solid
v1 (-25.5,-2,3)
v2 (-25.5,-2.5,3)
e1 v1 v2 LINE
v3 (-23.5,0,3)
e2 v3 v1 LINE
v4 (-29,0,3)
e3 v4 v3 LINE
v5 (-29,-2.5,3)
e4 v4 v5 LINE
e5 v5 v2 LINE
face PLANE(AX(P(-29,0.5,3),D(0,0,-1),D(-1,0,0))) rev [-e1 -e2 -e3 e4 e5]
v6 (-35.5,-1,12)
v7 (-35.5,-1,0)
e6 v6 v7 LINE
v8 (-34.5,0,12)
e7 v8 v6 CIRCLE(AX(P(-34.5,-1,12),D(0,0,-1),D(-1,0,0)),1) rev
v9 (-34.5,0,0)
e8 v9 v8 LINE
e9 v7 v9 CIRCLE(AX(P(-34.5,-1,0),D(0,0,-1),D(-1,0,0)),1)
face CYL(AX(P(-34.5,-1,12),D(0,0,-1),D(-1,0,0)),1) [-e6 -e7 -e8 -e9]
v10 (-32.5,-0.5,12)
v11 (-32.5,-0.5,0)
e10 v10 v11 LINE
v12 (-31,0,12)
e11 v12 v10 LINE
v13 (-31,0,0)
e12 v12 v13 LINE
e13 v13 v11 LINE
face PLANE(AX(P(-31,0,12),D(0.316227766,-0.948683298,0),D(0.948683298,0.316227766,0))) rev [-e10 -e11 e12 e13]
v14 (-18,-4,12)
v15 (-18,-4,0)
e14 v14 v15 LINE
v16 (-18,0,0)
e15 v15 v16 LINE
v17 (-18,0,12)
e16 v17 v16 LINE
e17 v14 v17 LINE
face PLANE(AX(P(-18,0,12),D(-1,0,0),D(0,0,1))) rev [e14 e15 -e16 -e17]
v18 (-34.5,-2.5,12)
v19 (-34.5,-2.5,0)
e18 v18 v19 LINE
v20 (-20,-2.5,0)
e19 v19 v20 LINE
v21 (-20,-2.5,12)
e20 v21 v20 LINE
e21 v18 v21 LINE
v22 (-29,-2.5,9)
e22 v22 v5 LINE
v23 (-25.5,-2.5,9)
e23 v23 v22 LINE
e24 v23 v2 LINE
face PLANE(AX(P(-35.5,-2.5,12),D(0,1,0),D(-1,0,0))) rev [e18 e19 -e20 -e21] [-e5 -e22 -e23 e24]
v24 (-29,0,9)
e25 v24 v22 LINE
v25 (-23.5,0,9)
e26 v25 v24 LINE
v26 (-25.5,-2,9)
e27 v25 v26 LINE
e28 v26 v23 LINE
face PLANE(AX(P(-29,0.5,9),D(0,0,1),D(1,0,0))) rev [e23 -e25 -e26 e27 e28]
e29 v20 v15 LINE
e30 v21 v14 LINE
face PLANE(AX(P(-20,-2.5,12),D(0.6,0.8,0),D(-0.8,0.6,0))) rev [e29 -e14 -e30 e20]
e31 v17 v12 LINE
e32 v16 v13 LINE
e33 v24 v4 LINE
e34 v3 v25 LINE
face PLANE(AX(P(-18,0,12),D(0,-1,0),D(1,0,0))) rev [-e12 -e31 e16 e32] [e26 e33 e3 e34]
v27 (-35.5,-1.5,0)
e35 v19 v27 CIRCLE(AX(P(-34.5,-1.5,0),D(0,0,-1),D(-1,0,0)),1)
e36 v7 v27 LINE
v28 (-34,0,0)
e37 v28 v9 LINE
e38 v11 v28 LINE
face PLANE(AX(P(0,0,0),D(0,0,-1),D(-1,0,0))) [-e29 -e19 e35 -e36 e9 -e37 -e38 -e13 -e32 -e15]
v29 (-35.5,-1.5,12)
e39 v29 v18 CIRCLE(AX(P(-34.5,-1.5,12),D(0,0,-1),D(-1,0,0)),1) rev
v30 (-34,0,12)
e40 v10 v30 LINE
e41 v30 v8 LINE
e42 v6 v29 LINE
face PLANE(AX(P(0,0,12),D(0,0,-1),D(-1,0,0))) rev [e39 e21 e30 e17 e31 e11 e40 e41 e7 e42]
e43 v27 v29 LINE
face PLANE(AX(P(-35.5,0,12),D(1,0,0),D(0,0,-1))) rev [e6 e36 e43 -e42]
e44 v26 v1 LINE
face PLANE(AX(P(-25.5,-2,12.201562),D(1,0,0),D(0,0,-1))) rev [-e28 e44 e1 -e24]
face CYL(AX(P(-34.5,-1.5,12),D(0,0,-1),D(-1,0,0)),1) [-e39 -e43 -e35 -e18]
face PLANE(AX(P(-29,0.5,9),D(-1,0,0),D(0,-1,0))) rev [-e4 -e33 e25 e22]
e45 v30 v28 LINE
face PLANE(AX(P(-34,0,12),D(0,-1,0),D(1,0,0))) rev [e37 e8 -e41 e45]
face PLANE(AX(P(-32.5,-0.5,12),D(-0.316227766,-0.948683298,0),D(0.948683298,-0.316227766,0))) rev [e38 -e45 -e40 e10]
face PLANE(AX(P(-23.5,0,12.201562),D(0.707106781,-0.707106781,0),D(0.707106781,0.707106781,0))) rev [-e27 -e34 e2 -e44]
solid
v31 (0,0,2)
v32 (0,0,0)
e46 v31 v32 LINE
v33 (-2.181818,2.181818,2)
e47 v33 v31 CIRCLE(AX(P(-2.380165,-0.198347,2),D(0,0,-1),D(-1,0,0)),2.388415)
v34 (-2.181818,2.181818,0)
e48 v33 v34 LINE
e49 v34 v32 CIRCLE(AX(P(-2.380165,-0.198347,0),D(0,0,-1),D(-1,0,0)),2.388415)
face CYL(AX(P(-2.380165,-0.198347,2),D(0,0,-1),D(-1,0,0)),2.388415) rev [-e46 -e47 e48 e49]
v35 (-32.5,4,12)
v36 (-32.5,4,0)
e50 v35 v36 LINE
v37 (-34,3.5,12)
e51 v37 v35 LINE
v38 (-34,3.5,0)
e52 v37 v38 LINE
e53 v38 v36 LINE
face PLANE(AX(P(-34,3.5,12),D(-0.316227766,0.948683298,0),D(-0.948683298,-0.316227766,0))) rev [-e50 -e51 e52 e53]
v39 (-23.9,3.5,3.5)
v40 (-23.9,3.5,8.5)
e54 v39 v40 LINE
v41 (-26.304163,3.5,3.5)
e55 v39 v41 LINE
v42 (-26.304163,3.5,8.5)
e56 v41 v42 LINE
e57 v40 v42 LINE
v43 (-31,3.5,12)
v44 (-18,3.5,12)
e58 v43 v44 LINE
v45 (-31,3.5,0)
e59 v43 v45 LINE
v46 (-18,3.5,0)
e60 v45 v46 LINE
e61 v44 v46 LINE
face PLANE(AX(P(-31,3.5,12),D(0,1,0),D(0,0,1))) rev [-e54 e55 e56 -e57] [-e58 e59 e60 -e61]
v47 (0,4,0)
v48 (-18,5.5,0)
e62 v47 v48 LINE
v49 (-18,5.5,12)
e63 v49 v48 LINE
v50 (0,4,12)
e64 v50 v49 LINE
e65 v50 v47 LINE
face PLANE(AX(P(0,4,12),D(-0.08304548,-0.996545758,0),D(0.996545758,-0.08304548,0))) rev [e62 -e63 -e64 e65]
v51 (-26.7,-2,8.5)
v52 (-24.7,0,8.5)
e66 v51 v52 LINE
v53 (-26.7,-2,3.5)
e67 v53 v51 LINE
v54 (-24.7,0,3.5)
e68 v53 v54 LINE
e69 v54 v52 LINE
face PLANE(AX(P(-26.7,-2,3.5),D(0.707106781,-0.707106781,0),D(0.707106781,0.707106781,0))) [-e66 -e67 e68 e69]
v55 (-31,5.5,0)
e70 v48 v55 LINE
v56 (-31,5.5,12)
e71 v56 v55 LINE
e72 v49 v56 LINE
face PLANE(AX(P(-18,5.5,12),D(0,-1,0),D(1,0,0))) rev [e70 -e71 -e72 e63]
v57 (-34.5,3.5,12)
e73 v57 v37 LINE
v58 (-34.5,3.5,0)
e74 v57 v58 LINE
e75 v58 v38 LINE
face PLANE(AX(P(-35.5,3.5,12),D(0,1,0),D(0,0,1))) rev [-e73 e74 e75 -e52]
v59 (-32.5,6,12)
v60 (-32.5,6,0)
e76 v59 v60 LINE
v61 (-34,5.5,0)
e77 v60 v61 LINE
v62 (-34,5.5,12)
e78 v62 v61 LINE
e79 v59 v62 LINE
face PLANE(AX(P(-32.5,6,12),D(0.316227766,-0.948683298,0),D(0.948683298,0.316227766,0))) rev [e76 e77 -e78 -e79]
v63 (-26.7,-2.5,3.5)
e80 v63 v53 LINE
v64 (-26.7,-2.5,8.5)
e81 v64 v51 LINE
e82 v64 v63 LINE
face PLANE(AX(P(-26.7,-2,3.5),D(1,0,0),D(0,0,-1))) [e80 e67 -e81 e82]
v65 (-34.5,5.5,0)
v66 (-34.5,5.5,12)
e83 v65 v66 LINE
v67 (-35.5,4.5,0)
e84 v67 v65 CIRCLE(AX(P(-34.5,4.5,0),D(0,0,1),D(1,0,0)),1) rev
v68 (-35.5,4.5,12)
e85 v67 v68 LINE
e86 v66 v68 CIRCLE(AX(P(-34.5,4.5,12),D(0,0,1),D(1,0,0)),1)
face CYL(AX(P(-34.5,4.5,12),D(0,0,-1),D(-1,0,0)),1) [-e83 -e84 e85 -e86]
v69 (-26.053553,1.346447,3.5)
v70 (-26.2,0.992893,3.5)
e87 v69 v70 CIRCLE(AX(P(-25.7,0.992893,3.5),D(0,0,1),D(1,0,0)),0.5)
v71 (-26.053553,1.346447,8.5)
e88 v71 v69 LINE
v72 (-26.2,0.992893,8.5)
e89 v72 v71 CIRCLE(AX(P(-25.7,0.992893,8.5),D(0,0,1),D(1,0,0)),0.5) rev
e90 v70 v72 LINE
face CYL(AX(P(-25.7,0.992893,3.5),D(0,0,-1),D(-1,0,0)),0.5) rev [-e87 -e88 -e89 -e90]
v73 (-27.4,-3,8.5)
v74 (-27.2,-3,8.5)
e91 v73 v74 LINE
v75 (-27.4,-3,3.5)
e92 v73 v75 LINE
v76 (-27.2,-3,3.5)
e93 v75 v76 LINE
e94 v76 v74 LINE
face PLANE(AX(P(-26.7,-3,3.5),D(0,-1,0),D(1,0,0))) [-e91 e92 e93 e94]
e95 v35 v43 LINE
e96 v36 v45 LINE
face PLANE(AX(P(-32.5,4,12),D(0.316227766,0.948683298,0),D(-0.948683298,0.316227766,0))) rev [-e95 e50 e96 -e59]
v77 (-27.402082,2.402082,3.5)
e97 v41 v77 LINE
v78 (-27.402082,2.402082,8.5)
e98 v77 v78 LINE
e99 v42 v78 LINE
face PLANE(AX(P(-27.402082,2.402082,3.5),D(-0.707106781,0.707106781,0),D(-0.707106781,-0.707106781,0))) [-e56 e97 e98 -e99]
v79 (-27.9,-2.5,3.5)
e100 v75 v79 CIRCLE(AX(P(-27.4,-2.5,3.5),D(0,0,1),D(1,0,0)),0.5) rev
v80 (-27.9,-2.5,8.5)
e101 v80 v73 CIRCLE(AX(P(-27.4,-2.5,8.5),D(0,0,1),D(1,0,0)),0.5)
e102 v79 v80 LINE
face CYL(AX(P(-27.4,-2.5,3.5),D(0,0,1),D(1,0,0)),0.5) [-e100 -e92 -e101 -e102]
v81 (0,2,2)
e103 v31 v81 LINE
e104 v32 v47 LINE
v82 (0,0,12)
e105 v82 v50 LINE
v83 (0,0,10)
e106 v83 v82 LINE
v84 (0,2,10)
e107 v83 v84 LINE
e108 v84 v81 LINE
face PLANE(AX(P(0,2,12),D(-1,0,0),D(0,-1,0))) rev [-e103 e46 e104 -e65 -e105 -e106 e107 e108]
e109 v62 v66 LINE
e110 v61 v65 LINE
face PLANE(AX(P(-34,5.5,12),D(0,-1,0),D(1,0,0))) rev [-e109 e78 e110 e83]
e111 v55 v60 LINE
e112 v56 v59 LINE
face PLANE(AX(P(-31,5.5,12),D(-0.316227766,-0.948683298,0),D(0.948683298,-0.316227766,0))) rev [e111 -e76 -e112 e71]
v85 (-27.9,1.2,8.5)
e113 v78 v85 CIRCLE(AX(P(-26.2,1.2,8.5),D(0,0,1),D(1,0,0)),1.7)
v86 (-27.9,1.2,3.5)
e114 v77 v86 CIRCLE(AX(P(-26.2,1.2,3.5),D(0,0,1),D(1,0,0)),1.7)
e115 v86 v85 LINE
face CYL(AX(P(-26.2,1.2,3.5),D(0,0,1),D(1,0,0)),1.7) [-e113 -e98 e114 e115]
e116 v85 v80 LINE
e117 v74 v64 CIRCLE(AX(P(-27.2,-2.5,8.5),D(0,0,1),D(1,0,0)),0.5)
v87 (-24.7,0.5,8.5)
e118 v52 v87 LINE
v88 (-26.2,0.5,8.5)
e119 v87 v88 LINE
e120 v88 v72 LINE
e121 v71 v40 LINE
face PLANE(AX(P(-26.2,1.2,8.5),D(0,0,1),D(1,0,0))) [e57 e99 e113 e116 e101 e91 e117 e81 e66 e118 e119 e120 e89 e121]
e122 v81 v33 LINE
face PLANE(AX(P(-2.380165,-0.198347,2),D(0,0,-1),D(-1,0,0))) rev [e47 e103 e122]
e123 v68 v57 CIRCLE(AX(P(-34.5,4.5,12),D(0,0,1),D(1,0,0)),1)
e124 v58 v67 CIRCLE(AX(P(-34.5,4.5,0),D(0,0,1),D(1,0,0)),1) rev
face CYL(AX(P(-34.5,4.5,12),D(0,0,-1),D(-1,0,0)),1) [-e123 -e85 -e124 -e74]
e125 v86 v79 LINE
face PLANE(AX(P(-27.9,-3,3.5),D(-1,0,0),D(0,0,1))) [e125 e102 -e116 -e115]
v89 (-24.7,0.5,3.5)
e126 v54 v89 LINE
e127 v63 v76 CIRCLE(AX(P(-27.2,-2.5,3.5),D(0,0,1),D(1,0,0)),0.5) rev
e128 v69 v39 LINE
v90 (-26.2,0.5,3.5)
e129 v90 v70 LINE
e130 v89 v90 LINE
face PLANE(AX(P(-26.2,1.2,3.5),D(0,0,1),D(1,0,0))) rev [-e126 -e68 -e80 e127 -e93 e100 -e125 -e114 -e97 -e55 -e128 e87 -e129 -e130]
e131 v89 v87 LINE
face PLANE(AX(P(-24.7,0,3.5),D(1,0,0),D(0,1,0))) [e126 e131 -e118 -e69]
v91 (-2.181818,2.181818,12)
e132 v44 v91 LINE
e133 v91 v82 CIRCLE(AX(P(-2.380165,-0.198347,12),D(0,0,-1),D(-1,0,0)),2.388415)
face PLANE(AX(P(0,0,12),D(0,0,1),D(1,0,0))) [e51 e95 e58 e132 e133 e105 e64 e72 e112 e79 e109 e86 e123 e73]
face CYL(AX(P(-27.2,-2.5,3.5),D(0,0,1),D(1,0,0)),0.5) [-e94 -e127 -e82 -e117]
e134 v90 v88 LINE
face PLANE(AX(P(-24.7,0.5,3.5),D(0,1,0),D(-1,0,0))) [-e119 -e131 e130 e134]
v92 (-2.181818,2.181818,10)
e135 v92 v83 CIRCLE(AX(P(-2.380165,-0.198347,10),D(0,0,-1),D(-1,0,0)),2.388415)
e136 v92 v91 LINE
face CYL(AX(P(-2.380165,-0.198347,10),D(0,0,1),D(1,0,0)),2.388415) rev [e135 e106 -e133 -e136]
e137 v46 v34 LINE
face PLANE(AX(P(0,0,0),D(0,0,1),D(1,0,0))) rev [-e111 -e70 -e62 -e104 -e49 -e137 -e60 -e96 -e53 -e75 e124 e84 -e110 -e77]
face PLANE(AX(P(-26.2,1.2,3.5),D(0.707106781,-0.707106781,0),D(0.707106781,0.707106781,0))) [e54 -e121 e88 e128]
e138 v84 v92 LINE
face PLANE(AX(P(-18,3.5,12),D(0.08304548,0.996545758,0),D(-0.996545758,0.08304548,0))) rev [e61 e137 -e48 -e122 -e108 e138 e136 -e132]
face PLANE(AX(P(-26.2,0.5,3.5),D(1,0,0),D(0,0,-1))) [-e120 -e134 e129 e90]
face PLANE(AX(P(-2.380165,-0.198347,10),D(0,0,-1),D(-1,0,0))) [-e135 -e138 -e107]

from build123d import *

# Parameters (mm, degrees)
BOSS_EXTRUDE1_DEPTH   = 12
BOSS_EXTRUDE1_2_DEPTH = 12
SKETCH2_W             = 5.5
SKETCH2_H             = 6
CUT_EXTRUDE1_DEPTH    = 3
BOSS_EXTRUDE2_DEPTH   = 6
BOSS_EXTRUDE3_START   = -6
BOSS_EXTRUDE3_DEPTH   = 2.5
FILLET7_R             = 1
FILLET8_R             = 1
FILLET10_R            = 1
FILLET11_R            = 1
BOSS_EXTRUDE4_DEPTH   = 2
BOSS_EXTRUDE5_START   = -10
BOSS_EXTRUDE5_DEPTH   = 2
FILLET12_R            = 0.5
FILLET13_R            = 0.5


with BuildPart() as part:
    # Sketch1 → Boss-Extrude1 (new body)
    with BuildSketch(Plane.XY):
        Polygon((0, 4), (-18, 5.5), (-31, 5.5), (-32.5, 6), (-34, 5.5), (-35.5, 5.5), (-35.5, 3.5), (-34, 3.5), (-32.5, 4), (-31, 3.5), (-18, 3.5), (0, 2), align=None)
    extrude(amount=BOSS_EXTRUDE1_DEPTH)

    # Sketch4 → Boss-Extrude3 (add, symmetric)
    with BuildSketch(Plane.XY.offset(12).offset(BOSS_EXTRUDE3_START)):
        with BuildLine():
            Line((-26.7, -2), (-24.7, 0))
            Line((-24.7, 0), (-24.7, 0.5))
            Line((-24.7, 0.5), (-26.2, 0.5))
            Line((-26.2, 0.5), (-26.2, 1.2))
            Line((-26.2, 1.2), (-23.9, 3.5))
            Line((-23.9, 3.5), (-26.304163056, 3.5))
            Line((-26.304163056, 3.5), (-27.402081528, 2.402081528))
            ThreePointArc((-27.402081528, 2.402081528), (-27.770595205, 1.850561835), (-27.9, 1.2))
            Line((-27.9, 1.2), (-27.9, -3))
            Line((-27.9, -3), (-26.7, -3))
            Line((-26.7, -3), (-26.7, -2))
        make_face()
    extrude(amount=BOSS_EXTRUDE3_DEPTH, both=True)

    # Fillet8
    fillet8_edges = [part.edges().sort_by_distance(p)[0] for p in [
        (-35.5, 3.5, 6),
    ]]
    fillet(fillet8_edges, radius=FILLET8_R)

    # Fillet10
    fillet10_edges = [part.edges().sort_by_distance(p)[0] for p in [
        (-35.5, 5.5, 6),
    ]]
    fillet(fillet10_edges, radius=FILLET10_R - 0.0001)  # a hair under: the kernel refuses the full size

    # Sketch5 → Boss-Extrude4 (add)
    with BuildSketch(Plane.XY.offset(12)):
        with BuildLine():
            Line((0, 2), (0, 0))
            ThreePointArc((0, 0), (-0.691300526, 1.490517656), (-2.181818182, 2.181818182))
            Line((-2.181818182, 2.181818182), (0, 2))
        make_face()
    extrude(amount=-BOSS_EXTRUDE4_DEPTH)

    # Sketch5<2> → Boss-Extrude5 (add)
    with BuildSketch(Plane.XY.offset(12).offset(BOSS_EXTRUDE5_START)):
        with BuildLine():
            Line((0, 2), (0, 0))
            ThreePointArc((0, 0), (-0.691300526, 1.490517656), (-2.181818182, 2.181818182))
            Line((-2.181818182, 2.181818182), (0, 2))
        make_face()
    extrude(amount=-BOSS_EXTRUDE5_DEPTH)

    # Fillet12
    fillet12_edges = [part.edges().sort_by_distance(p)[0] for p in [
        (-26.7, -3, 6),
        (-27.9, -3, 6),
    ]]
    fillet(fillet12_edges, radius=FILLET12_R)

    # Fillet13
    fillet13_edges = [part.edges().sort_by_distance(p)[0] for p in [
        (-26.2, 1.2, 6),
    ]]
    fillet(fillet13_edges, radius=FILLET13_R)


with BuildPart() as body_2:
    # Sketch1 → Boss-Extrude1 2 (new body)
    with BuildSketch(Plane.XY):
        Polygon((-35.5, -2.5), (-20, -2.5), (-18, -4), (-18, 0), (-31, 0), (-32.5, -0.5), (-34, 0), (-35.5, 0), align=None)
    extrude(amount=BOSS_EXTRUDE1_2_DEPTH)

    # Sketch2 → Cut-Extrude1 (cut)
    with BuildSketch(Plane.XZ.offset(2.5)):
        with Locations((-26.25, 6)):
            Rectangle(SKETCH2_W, SKETCH2_H)
    extrude(amount=-CUT_EXTRUDE1_DEPTH, mode=Mode.SUBTRACT)

    # Sketch3 → Boss-Extrude2 (add)
    with BuildSketch(Plane.XY.offset(3)):
        Polygon((-23.5, 0), (-25.5, -2), (-25.5, -2.5), (-23.5, -2.5), align=None)
    extrude(amount=BOSS_EXTRUDE2_DEPTH)

    # Fillet7
    fillet7_edges = [body_2.edges().sort_by_distance(p)[0] for p in [
        (-35.5, 0, 6),
    ]]
    fillet(fillet7_edges, radius=FILLET7_R)

    # Fillet11
    fillet11_edges = [body_2.edges().sort_by_distance(p)[0] for p in [
        (-35.5, -2.5, 6),
    ]]
    fillet(fillet11_edges, radius=FILLET11_R)


solid = Compound([part.part, body_2.part])
